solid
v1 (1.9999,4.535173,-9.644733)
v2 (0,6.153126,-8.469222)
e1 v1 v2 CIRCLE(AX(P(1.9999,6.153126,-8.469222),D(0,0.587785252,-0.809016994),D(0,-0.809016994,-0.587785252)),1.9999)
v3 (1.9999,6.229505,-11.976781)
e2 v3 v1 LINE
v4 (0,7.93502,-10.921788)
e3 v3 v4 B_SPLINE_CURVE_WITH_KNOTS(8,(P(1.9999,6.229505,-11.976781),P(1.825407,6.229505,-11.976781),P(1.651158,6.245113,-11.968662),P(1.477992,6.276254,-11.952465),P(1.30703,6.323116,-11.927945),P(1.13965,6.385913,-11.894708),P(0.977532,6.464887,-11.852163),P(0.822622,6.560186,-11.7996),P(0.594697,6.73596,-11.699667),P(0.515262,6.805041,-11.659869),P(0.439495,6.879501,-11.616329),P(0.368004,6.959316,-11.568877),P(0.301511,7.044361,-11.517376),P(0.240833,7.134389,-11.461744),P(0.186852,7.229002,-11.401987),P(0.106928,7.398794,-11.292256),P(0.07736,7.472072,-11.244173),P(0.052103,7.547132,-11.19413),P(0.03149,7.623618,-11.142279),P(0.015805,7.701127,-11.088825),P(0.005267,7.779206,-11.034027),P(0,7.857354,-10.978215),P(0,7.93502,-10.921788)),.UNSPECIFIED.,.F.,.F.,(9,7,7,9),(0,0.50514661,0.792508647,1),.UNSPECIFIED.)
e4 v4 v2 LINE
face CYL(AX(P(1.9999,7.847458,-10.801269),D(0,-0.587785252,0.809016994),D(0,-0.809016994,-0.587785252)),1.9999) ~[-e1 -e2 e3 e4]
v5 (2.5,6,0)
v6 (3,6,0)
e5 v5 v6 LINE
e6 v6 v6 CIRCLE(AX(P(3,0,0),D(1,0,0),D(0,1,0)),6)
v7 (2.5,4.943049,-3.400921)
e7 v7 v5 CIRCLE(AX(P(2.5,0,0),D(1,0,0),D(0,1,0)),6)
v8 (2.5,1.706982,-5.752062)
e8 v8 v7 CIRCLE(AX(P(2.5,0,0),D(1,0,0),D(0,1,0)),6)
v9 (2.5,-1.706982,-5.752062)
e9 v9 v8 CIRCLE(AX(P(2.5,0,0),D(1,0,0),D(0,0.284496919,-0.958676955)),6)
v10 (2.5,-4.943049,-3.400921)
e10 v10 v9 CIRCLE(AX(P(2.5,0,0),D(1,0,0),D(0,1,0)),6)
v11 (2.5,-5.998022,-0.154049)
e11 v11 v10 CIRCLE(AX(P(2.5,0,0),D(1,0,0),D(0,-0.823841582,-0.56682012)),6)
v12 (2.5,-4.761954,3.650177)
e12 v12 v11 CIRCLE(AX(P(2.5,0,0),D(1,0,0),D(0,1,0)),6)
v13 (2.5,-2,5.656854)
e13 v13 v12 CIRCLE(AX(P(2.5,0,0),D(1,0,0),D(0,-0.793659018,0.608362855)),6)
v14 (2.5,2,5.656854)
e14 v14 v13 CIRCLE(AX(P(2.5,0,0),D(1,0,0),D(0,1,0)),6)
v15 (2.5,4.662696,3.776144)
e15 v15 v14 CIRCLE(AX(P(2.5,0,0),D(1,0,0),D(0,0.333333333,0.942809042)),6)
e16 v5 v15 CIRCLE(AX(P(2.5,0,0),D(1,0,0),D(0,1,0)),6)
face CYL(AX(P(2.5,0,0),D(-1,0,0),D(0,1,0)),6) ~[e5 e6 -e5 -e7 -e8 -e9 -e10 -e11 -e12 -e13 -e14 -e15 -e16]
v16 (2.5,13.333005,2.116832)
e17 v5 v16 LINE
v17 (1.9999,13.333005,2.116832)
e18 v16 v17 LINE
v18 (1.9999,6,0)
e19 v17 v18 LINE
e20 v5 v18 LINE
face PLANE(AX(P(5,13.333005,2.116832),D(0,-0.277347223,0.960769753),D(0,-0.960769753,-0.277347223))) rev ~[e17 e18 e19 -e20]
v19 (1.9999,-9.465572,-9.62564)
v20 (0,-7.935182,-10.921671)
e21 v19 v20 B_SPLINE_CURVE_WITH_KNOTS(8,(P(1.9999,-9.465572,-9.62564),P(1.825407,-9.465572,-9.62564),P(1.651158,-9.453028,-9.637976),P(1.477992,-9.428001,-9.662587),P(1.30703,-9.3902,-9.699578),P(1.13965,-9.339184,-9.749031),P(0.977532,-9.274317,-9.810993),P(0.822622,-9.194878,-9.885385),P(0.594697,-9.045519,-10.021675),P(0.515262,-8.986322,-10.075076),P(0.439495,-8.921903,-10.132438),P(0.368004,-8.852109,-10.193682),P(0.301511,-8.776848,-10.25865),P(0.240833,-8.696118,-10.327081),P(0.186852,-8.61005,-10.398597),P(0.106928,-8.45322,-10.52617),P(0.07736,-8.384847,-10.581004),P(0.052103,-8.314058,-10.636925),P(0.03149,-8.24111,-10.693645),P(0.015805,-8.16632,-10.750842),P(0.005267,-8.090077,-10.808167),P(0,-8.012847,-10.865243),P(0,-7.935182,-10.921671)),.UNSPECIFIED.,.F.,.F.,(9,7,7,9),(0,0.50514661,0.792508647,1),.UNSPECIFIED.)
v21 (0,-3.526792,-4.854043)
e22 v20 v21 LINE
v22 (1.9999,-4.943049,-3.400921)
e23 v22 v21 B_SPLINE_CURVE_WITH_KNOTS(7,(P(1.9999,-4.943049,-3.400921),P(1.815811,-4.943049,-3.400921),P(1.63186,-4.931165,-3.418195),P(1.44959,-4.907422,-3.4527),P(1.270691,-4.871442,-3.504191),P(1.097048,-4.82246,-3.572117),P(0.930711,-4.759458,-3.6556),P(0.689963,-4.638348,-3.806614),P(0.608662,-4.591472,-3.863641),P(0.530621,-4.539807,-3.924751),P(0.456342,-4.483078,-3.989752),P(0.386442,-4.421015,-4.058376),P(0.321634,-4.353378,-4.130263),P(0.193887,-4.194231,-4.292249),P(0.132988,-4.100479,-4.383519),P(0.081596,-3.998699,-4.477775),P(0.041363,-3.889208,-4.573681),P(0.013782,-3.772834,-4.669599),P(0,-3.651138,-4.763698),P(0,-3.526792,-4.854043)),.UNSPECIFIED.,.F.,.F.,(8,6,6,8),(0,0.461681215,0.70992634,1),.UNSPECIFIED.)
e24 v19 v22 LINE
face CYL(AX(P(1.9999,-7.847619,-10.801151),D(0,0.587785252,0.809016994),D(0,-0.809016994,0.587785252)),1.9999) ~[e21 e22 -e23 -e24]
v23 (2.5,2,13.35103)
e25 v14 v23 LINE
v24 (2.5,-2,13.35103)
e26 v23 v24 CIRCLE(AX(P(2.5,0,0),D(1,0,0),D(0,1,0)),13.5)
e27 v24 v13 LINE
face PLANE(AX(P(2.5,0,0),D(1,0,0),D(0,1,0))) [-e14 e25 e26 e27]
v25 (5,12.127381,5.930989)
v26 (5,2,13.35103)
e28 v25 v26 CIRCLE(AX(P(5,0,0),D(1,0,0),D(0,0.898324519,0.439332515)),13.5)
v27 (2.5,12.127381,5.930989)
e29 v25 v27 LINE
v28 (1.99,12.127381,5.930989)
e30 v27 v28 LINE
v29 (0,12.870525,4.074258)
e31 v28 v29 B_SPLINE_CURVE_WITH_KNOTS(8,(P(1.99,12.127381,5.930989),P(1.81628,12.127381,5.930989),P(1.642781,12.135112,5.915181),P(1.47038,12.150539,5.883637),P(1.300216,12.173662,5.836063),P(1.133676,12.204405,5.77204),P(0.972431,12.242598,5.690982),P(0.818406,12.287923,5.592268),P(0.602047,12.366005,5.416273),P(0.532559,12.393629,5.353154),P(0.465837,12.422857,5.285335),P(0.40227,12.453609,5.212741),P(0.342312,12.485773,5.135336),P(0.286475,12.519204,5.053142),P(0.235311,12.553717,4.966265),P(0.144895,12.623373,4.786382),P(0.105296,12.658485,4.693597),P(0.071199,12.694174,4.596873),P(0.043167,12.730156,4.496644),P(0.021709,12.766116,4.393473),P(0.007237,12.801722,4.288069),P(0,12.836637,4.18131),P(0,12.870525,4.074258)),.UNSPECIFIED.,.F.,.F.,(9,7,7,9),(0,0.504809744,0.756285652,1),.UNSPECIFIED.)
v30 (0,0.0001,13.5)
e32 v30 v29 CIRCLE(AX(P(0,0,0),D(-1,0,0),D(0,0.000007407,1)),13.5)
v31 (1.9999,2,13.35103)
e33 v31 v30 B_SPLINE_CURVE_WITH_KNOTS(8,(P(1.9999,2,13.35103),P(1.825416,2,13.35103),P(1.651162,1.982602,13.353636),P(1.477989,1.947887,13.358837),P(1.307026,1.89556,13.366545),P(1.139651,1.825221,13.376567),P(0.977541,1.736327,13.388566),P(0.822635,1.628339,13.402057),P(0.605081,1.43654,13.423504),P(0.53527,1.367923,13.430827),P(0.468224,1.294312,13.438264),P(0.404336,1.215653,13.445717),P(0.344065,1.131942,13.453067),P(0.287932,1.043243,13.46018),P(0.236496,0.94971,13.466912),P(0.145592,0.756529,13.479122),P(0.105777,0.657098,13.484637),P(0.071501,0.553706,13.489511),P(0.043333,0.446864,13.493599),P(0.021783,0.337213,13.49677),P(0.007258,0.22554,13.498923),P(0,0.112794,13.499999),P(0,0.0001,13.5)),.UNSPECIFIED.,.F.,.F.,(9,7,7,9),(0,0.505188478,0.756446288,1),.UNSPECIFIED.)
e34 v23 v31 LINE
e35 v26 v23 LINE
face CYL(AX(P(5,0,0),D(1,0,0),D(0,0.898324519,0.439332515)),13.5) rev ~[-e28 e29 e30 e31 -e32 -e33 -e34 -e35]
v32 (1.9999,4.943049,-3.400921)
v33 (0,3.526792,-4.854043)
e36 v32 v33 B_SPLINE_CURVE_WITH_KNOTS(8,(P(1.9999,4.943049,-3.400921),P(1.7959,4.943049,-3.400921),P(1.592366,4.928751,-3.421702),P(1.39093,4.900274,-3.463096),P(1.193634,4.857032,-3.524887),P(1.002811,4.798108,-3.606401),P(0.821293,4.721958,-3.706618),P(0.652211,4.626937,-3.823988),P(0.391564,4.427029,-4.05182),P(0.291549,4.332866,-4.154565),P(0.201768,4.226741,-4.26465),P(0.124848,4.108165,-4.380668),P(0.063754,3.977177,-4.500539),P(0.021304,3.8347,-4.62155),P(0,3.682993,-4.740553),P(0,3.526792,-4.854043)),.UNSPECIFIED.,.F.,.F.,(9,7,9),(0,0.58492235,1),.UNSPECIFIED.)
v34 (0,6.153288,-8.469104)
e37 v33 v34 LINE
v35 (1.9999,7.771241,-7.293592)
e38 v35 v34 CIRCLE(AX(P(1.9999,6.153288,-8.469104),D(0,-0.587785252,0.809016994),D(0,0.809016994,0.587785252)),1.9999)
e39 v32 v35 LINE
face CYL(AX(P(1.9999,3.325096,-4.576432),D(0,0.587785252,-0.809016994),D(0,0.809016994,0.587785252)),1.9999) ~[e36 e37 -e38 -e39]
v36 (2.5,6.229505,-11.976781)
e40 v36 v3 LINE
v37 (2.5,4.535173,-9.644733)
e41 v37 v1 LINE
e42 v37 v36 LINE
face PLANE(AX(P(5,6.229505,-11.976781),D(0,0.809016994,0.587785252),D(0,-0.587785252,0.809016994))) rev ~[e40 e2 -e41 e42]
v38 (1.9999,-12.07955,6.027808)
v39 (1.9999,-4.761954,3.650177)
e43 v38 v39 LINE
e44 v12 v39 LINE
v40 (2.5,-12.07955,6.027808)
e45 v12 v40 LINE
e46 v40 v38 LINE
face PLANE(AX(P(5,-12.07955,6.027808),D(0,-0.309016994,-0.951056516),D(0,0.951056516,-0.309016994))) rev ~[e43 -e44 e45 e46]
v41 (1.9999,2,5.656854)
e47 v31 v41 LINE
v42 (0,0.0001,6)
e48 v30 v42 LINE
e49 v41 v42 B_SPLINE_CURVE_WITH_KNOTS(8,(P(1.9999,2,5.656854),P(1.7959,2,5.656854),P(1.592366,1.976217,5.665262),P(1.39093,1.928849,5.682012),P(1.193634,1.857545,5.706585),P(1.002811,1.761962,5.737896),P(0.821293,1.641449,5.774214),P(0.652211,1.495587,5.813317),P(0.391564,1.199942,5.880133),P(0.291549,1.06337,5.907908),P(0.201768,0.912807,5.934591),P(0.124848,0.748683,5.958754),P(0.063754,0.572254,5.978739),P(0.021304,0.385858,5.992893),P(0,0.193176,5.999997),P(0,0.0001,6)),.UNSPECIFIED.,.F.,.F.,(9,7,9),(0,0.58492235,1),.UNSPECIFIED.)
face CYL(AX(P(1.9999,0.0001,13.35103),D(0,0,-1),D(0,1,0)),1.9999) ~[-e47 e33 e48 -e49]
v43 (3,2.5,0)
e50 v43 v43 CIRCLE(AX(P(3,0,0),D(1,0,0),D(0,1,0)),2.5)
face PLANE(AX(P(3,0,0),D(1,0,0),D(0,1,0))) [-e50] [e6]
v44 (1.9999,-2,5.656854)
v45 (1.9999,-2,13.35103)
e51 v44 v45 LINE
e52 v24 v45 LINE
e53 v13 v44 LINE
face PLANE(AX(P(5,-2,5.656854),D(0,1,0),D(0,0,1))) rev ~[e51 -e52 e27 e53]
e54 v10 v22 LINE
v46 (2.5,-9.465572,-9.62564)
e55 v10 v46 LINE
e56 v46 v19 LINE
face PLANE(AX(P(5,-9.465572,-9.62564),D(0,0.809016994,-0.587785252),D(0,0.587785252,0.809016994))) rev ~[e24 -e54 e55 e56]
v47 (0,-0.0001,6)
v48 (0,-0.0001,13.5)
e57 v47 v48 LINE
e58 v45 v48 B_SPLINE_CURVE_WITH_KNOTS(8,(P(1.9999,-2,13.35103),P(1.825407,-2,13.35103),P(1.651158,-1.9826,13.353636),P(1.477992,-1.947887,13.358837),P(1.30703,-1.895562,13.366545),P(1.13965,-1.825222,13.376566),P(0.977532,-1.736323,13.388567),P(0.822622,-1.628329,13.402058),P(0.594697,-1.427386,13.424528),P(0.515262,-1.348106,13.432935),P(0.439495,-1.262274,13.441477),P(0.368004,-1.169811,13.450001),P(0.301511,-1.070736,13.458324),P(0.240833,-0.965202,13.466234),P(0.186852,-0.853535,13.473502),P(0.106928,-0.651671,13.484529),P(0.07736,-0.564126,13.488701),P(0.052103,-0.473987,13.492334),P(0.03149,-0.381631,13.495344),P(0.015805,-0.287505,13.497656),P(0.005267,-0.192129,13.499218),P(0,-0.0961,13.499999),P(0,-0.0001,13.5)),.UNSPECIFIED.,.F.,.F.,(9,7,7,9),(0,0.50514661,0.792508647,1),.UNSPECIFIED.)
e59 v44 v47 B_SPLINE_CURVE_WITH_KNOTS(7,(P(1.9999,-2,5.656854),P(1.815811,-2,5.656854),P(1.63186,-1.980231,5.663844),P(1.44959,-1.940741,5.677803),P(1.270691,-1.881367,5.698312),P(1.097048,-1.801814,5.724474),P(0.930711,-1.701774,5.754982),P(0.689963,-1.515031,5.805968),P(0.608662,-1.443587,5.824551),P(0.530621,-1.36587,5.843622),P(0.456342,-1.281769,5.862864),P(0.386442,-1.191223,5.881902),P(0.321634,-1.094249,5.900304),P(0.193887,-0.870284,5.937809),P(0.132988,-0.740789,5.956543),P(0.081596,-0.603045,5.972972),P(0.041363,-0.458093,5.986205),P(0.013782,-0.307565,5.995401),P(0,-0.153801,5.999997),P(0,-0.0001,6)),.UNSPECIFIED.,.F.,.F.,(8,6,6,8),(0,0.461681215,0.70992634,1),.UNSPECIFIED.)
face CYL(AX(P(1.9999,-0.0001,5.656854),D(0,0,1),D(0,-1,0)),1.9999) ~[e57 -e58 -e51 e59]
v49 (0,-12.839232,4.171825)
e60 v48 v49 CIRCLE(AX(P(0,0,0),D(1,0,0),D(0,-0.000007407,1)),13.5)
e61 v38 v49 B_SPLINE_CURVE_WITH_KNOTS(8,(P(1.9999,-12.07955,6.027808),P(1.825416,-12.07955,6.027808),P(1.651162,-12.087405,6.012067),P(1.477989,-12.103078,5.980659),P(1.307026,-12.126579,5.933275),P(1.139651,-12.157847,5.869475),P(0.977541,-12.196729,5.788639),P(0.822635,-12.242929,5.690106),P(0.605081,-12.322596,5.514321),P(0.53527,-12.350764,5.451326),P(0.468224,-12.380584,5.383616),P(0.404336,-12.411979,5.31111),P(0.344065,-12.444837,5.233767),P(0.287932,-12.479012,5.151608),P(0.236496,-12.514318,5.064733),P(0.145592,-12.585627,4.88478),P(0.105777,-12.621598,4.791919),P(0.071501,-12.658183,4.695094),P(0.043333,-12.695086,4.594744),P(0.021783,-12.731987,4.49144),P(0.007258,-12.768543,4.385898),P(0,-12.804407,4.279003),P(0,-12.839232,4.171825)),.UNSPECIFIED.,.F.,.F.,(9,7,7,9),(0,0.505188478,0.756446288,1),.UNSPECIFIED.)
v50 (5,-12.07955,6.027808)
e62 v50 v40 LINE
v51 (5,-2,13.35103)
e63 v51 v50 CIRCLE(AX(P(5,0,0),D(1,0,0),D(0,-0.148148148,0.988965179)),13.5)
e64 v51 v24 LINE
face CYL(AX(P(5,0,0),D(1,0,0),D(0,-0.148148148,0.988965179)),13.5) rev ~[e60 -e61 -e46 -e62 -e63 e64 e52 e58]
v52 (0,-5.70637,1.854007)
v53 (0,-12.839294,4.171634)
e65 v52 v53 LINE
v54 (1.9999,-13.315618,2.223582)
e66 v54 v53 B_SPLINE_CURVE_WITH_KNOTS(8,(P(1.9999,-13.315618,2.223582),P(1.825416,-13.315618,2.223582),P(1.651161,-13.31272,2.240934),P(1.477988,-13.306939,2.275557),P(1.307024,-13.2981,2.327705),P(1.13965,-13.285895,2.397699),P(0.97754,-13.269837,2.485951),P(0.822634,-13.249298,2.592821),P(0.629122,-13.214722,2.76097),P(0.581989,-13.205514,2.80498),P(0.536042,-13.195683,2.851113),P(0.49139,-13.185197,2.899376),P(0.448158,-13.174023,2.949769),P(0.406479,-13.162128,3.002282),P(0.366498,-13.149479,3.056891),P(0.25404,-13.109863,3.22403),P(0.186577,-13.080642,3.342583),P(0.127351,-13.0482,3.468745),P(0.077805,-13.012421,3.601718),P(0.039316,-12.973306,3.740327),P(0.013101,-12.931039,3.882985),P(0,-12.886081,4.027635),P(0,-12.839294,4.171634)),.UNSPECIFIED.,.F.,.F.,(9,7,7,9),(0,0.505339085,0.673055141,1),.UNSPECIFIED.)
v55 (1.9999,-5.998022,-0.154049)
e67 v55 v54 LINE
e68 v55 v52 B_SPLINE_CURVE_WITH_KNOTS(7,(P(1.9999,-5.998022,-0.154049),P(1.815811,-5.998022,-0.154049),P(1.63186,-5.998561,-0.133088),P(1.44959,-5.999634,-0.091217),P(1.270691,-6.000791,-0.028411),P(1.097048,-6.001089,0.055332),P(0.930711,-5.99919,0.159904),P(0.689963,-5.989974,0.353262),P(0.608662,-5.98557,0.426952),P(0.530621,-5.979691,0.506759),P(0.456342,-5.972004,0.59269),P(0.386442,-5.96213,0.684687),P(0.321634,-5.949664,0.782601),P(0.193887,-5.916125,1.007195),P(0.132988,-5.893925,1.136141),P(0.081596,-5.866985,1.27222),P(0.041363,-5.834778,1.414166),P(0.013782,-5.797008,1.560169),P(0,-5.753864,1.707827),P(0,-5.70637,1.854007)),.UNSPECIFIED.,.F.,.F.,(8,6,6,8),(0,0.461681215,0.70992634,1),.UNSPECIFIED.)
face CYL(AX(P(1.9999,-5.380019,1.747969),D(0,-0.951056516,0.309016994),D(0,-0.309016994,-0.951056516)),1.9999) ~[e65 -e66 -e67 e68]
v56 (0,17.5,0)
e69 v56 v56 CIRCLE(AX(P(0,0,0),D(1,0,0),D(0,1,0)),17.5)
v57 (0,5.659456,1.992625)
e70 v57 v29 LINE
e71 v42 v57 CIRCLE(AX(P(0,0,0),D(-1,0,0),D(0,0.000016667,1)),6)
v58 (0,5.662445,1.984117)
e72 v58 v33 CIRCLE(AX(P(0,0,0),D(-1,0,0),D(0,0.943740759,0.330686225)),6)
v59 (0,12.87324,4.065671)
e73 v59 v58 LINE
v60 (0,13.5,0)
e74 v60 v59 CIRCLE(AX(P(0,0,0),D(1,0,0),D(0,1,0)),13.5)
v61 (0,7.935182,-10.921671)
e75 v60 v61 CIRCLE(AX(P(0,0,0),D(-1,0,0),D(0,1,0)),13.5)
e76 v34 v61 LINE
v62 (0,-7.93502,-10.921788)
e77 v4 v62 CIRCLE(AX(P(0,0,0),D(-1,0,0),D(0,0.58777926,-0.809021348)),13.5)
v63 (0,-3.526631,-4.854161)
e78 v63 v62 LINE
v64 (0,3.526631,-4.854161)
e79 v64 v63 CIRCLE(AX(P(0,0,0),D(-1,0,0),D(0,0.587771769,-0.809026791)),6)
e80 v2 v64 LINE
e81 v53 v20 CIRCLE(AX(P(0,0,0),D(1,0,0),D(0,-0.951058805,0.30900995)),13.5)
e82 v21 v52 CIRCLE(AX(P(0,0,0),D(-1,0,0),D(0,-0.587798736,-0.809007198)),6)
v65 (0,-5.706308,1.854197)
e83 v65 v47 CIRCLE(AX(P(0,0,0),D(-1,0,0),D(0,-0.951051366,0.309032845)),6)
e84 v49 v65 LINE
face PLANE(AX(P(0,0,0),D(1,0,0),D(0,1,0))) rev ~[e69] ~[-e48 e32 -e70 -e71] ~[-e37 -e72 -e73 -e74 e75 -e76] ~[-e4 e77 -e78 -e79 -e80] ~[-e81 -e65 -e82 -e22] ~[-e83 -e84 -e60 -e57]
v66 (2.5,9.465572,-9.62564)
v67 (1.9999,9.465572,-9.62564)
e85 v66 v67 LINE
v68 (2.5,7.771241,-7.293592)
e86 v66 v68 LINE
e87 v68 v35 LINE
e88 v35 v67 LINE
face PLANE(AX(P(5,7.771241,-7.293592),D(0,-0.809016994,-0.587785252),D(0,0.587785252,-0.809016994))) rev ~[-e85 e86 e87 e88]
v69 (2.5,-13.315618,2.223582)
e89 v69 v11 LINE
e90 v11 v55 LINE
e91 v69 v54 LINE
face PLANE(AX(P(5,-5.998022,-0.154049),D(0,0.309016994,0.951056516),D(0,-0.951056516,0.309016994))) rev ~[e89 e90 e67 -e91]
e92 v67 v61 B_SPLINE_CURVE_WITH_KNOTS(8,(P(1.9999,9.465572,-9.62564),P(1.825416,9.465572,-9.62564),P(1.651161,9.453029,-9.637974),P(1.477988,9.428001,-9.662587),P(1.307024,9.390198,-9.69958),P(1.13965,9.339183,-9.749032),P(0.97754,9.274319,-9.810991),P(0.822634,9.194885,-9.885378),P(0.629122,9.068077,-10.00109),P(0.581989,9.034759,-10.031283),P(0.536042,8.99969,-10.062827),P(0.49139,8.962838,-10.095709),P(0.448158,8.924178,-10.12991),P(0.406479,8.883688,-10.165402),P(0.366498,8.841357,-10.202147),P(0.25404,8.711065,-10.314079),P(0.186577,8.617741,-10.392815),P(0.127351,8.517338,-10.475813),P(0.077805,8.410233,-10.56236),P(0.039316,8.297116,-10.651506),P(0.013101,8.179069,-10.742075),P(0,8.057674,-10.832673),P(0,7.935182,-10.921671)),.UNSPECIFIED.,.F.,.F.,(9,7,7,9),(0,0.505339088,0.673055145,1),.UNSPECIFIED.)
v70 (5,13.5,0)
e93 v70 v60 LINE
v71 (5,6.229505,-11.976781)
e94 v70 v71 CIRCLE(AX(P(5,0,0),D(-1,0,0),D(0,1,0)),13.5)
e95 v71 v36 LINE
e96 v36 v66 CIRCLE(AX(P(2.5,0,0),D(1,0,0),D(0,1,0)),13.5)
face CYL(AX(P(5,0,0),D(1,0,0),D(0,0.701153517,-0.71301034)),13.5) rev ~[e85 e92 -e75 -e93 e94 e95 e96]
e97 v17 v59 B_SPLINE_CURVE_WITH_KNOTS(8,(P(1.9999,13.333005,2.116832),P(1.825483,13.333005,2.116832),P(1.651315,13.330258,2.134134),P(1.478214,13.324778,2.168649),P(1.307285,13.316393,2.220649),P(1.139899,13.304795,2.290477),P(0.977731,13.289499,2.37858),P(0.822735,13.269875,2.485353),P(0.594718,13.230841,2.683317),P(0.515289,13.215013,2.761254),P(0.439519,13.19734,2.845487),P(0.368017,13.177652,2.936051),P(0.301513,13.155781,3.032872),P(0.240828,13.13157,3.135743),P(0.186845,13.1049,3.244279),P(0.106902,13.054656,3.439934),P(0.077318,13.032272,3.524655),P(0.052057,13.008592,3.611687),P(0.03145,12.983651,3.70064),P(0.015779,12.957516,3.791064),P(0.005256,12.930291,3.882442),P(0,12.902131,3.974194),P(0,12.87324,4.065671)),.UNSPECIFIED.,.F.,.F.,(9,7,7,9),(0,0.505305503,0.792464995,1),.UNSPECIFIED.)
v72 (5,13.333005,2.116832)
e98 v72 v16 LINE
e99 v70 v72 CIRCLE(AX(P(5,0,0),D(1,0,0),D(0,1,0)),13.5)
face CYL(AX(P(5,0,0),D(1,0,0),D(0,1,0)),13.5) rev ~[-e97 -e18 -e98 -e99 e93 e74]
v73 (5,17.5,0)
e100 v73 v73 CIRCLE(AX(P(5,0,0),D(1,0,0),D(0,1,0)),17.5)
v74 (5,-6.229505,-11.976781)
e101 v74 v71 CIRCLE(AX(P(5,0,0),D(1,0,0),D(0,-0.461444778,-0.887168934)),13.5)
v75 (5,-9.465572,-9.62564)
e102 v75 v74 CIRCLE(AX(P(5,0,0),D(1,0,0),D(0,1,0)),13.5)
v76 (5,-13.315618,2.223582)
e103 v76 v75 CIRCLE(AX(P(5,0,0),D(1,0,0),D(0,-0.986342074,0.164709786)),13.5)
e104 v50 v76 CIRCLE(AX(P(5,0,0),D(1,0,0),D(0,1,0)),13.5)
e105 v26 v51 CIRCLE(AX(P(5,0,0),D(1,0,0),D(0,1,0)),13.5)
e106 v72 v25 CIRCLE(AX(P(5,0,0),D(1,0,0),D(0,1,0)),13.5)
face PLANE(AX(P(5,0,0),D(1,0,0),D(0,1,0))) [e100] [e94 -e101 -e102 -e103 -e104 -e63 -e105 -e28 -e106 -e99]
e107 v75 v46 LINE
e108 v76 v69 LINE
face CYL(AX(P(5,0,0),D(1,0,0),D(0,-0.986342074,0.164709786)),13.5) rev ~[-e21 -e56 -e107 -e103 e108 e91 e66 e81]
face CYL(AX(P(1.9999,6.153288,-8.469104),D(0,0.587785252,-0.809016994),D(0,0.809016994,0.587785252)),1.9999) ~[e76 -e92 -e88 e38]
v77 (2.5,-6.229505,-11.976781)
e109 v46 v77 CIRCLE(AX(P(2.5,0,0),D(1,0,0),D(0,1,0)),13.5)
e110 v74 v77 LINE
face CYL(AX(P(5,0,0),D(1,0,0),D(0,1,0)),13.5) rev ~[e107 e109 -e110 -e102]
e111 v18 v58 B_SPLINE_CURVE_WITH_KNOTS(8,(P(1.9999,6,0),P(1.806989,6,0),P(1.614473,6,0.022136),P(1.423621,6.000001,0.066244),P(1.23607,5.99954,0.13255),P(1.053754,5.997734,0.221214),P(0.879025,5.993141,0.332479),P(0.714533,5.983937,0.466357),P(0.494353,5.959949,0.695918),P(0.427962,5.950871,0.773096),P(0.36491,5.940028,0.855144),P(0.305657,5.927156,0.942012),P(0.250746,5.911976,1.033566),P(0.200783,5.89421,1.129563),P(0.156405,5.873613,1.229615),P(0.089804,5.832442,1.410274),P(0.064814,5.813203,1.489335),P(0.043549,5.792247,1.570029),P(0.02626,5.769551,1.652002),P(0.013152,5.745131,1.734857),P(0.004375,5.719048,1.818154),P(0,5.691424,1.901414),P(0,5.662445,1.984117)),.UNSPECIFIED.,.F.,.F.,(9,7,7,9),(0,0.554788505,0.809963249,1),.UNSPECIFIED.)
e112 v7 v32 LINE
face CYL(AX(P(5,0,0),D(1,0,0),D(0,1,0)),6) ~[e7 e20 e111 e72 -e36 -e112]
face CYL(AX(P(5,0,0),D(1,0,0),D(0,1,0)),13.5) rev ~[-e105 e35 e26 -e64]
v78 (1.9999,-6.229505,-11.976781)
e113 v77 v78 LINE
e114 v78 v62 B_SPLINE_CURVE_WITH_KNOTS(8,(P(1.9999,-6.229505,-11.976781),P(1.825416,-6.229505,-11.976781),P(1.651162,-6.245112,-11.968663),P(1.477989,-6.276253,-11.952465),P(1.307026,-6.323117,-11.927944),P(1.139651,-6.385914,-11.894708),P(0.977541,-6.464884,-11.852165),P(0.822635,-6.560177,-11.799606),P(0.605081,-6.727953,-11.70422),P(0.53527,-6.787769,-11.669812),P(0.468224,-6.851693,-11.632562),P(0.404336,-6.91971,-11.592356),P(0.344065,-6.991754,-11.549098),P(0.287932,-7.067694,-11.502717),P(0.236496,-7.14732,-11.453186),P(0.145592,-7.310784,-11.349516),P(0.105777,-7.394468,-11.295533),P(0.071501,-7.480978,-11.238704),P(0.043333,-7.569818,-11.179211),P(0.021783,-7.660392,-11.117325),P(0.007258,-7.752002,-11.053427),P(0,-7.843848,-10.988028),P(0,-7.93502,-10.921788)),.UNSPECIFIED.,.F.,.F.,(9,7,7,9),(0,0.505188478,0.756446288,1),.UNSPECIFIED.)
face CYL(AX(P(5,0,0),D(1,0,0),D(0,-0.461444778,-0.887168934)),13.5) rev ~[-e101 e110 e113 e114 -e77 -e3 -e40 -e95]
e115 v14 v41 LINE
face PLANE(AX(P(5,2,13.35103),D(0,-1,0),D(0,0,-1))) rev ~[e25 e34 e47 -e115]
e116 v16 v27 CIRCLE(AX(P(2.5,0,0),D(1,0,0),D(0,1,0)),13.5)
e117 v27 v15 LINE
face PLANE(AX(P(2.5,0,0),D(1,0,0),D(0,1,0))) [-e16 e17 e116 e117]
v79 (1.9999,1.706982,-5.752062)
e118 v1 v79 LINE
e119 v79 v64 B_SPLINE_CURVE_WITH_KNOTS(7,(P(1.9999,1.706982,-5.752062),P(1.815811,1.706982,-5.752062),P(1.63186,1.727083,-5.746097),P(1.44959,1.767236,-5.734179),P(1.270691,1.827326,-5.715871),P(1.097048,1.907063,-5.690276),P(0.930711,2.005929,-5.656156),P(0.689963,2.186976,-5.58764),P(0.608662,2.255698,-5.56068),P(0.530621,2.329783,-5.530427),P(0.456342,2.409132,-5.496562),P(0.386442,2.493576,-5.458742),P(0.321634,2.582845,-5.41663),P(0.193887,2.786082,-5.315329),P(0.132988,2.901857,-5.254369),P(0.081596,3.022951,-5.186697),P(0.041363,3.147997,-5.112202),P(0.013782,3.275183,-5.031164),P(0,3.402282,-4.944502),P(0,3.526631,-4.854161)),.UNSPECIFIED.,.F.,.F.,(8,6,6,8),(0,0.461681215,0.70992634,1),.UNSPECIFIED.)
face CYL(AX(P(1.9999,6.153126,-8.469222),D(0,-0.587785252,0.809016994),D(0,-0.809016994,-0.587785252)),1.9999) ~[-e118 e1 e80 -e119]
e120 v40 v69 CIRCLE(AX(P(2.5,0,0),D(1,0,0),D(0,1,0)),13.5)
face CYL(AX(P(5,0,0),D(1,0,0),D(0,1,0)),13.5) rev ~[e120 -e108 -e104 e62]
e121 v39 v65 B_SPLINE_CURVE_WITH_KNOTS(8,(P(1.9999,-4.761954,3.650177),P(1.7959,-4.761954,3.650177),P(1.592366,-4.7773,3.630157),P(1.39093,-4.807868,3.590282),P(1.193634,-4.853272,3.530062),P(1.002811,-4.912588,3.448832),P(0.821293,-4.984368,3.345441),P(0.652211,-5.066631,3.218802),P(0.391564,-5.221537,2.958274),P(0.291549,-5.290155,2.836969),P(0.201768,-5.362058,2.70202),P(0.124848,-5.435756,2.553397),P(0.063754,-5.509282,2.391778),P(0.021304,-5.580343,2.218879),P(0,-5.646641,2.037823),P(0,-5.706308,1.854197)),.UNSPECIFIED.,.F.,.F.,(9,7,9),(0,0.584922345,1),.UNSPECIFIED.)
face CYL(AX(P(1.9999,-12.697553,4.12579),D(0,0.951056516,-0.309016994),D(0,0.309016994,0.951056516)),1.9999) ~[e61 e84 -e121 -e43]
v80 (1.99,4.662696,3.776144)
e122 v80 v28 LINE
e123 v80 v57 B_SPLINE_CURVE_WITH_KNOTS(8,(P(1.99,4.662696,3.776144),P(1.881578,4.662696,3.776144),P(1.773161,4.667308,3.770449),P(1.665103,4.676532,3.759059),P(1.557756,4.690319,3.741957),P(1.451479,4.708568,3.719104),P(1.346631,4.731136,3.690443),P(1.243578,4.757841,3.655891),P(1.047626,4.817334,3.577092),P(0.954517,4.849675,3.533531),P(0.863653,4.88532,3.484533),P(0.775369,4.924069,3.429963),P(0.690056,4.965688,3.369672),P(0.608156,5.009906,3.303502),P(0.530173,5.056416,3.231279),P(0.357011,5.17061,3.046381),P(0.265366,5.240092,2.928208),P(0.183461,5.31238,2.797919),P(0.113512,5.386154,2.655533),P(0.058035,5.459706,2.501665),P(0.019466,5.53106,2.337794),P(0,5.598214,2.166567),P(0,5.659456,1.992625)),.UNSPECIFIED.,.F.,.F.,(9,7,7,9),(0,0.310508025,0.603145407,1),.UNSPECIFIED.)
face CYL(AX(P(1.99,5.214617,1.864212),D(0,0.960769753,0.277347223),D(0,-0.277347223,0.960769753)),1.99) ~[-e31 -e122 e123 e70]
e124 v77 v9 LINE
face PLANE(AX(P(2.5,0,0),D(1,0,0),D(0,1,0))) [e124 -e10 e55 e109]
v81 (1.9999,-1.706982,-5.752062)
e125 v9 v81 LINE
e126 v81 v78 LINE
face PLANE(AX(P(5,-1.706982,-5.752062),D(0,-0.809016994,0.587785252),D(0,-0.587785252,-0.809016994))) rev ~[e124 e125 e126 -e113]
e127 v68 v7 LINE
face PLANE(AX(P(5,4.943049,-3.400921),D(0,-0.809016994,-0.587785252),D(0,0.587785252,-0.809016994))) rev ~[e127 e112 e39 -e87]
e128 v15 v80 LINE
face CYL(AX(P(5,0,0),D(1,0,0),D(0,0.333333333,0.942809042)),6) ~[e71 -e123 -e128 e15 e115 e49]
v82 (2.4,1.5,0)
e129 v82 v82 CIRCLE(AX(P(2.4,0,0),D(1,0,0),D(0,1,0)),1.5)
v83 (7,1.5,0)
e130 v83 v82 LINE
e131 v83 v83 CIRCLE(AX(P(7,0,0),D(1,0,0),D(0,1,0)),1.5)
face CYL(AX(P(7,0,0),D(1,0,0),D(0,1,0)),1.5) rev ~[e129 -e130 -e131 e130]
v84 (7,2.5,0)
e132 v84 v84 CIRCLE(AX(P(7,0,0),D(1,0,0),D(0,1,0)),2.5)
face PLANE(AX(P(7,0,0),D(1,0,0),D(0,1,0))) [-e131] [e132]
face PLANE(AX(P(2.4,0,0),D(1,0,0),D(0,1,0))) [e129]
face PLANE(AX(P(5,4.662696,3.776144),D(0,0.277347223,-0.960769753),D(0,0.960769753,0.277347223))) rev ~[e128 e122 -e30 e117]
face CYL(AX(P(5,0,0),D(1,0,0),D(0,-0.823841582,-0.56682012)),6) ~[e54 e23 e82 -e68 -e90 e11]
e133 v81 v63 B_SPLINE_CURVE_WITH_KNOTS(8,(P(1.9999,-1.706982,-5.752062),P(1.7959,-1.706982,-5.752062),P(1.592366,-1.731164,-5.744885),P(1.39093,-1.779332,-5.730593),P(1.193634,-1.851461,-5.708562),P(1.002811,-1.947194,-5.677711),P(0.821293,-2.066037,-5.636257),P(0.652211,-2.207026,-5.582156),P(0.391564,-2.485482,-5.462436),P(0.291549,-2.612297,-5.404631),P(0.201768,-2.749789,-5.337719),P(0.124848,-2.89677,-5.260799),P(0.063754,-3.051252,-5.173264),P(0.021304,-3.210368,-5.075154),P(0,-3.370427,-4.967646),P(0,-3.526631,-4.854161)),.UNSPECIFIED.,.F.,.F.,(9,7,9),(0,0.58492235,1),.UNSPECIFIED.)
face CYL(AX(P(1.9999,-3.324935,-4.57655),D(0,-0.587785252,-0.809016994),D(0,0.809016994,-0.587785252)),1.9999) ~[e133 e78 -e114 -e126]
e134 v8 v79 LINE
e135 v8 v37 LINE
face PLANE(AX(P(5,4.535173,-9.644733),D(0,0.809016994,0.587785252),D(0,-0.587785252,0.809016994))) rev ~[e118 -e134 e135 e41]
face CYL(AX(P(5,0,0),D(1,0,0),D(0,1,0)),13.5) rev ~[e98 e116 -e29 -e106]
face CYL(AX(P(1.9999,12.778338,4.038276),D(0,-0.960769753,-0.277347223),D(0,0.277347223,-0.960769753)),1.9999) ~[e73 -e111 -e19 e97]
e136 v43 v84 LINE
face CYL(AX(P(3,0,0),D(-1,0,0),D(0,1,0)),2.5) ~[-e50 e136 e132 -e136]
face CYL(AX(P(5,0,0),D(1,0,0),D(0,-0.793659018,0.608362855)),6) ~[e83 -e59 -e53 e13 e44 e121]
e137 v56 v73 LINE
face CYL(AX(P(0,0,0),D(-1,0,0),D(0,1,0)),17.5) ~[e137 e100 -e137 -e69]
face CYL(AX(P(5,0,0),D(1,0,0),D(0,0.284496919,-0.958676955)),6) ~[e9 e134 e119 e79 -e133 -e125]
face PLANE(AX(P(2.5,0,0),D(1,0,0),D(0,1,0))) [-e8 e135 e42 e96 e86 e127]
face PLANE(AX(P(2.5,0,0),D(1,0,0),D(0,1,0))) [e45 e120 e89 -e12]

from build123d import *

# Parameters (mm, degrees)
F0_R      = 17.5
F1_DEPTH  = 5
F3_DEPTH  = 25
F4_R      = 13.5
F5_DEPTH  = 2.5
F6_R      = 1.9999
F7_R      = 1.99
F8_R      = 6
F9_DEPTH  = 0.5
F10_R     = 2.5
F11_DEPTH = 4
F12_R     = 1.5
F13_DEPTH = 4.6


# Not quite as in the source:
# - a fillet or chamfer is up to 0.001 mm smaller than in the source, because OpenCascade refuses the exact size


with BuildPart() as f1:
    # F0 (on Right) → F1 (new body)
    with BuildSketch(Plane.YZ):
        Circle(F0_R)
    extrude(amount=F1_DEPTH)

    # F2 (on face) → F3 (cut)
    with BuildSketch(Plane.YZ.offset(5)):
        with BuildLine():
            Line((-2, 5.6568542495), (-2, 13.3510299228))
            ThreePointArc((-2, 13.3510299228), (-7.9351009059, 10.9217294241), (-12.0795500186, 6.0278081711))
            Line((-12.0795500186, 6.0278081711), (-4.761954107, 3.6501771304))
            ThreePointArc((-4.761954107, 3.6501771304), (-3.5267115138, 4.8541019662), (-2, 5.6568542495))
        make_face()
        with BuildLine():
            Line((4.6626960874, 3.7761442234), (12.1273810063, 5.9309889503))
            ThreePointArc((12.1273810063, 5.9309889503), (7.9787201688, 10.8899047042), (2, 13.3510299228))
            Line((2, 13.3510299228), (2, 5.6568542495))
            ThreePointArc((2, 5.6568542495), (3.4615238464, 4.9008012264), (4.6626960874, 3.7761442234))
        make_face()
        with BuildLine():
            ThreePointArc((9.4655724803, -9.6256395954), (12.4506069829, -5.2184658433), (13.5, 0))
            ThreePointArc((13.5, 0), (13.4581864786, 1.0617046234), (13.3330049322, 2.1168324159))
            Line((13.3330049322, 2.1168324159), (6, 0))
            ThreePointArc((6, 0), (5.7296726323, -1.7806884981), (4.943049491, -3.400920718))
            Line((4.943049491, -3.400920718), (7.7712408853, -7.2935922208))
            Line((7.7712408853, -7.2935922208), (9.4655724803, -9.6256395954))
        make_face()
        with BuildLine():
            ThreePointArc((-6.2295045028, -11.9767806046), (0, -13.5), (6.2295045028, -11.9767806046))
            Line((6.2295045028, -11.9767806046), (4.5351729078, -9.64473323))
            Line((4.5351729078, -9.64473323), (1.7069815135, -5.7520617271))
            ThreePointArc((1.7069815135, -5.7520617271), (0, -6), (-1.7069815135, -5.7520617271))
            Line((-1.7069815135, -5.7520617271), (-6.2295045028, -11.9767806046))
        make_face()
        with BuildLine():
            Line((-9.4655724803, -9.6256395954), (-4.943049491, -3.400920718))
            ThreePointArc((-4.943049491, -3.400920718), (-5.7063390978, -1.8541019662), (-5.9980220845, -0.1540489348))
            Line((-5.9980220845, -0.1540489348), (-13.3156179961, 2.223582106))
            ThreePointArc((-13.3156179961, 2.223582106), (-12.83926297, -4.1717294241), (-9.4655724803, -9.6256395954))
        make_face()
    extrude(amount=-F3_DEPTH, mode=Mode.SUBTRACT)

    # F4 (on face) → F5 (cut)
    with BuildSketch(Plane.YZ.offset(5)):
        Circle(F4_R)
    extrude(amount=-F5_DEPTH, mode=Mode.SUBTRACT)

    # F6 (radius 2 in the source; OpenCascade refuses exactly that, so slightly less here)
    f6_edges = [f1.edges().sort_by_distance(p)[0] for p in [
        (0, -9.65682, 1.034767),
        (0, -8.420752, 4.838993),
        (0, -7.204311, -6.51328),
        (0, -3.968243, -8.864421),
        (0, 3.968243, -8.864421),
        (0, 7.204311, -6.51328),
        (0, 9.666502, 1.058416),
        (0, 2, 9.503942),
        (0, -2, 9.503942),
    ]]
    fillet(f6_edges, radius=F6_R)

    # F7
    f7_edges = [f1.edges().sort_by_distance(p)[0] for p in [
        (0, 8.395039, 4.853567),
    ]]
    fillet(f7_edges, radius=F7_R)

    # F8 (on face) → F9 (join)
    with BuildSketch(Plane.YZ.offset(2.5)):
        Circle(F8_R)
    extrude(amount=F9_DEPTH)

    # F10 (on face) → F11 (join)
    with BuildSketch(Plane.YZ.offset(3)):
        Circle(F10_R)
    extrude(amount=F11_DEPTH)

    # F12 (on face) → F13 (cut)
    with BuildSketch(Plane.YZ.offset(7)):
        Circle(F12_R)
    extrude(amount=-F13_DEPTH, mode=Mode.SUBTRACT)


solid = f1.part
